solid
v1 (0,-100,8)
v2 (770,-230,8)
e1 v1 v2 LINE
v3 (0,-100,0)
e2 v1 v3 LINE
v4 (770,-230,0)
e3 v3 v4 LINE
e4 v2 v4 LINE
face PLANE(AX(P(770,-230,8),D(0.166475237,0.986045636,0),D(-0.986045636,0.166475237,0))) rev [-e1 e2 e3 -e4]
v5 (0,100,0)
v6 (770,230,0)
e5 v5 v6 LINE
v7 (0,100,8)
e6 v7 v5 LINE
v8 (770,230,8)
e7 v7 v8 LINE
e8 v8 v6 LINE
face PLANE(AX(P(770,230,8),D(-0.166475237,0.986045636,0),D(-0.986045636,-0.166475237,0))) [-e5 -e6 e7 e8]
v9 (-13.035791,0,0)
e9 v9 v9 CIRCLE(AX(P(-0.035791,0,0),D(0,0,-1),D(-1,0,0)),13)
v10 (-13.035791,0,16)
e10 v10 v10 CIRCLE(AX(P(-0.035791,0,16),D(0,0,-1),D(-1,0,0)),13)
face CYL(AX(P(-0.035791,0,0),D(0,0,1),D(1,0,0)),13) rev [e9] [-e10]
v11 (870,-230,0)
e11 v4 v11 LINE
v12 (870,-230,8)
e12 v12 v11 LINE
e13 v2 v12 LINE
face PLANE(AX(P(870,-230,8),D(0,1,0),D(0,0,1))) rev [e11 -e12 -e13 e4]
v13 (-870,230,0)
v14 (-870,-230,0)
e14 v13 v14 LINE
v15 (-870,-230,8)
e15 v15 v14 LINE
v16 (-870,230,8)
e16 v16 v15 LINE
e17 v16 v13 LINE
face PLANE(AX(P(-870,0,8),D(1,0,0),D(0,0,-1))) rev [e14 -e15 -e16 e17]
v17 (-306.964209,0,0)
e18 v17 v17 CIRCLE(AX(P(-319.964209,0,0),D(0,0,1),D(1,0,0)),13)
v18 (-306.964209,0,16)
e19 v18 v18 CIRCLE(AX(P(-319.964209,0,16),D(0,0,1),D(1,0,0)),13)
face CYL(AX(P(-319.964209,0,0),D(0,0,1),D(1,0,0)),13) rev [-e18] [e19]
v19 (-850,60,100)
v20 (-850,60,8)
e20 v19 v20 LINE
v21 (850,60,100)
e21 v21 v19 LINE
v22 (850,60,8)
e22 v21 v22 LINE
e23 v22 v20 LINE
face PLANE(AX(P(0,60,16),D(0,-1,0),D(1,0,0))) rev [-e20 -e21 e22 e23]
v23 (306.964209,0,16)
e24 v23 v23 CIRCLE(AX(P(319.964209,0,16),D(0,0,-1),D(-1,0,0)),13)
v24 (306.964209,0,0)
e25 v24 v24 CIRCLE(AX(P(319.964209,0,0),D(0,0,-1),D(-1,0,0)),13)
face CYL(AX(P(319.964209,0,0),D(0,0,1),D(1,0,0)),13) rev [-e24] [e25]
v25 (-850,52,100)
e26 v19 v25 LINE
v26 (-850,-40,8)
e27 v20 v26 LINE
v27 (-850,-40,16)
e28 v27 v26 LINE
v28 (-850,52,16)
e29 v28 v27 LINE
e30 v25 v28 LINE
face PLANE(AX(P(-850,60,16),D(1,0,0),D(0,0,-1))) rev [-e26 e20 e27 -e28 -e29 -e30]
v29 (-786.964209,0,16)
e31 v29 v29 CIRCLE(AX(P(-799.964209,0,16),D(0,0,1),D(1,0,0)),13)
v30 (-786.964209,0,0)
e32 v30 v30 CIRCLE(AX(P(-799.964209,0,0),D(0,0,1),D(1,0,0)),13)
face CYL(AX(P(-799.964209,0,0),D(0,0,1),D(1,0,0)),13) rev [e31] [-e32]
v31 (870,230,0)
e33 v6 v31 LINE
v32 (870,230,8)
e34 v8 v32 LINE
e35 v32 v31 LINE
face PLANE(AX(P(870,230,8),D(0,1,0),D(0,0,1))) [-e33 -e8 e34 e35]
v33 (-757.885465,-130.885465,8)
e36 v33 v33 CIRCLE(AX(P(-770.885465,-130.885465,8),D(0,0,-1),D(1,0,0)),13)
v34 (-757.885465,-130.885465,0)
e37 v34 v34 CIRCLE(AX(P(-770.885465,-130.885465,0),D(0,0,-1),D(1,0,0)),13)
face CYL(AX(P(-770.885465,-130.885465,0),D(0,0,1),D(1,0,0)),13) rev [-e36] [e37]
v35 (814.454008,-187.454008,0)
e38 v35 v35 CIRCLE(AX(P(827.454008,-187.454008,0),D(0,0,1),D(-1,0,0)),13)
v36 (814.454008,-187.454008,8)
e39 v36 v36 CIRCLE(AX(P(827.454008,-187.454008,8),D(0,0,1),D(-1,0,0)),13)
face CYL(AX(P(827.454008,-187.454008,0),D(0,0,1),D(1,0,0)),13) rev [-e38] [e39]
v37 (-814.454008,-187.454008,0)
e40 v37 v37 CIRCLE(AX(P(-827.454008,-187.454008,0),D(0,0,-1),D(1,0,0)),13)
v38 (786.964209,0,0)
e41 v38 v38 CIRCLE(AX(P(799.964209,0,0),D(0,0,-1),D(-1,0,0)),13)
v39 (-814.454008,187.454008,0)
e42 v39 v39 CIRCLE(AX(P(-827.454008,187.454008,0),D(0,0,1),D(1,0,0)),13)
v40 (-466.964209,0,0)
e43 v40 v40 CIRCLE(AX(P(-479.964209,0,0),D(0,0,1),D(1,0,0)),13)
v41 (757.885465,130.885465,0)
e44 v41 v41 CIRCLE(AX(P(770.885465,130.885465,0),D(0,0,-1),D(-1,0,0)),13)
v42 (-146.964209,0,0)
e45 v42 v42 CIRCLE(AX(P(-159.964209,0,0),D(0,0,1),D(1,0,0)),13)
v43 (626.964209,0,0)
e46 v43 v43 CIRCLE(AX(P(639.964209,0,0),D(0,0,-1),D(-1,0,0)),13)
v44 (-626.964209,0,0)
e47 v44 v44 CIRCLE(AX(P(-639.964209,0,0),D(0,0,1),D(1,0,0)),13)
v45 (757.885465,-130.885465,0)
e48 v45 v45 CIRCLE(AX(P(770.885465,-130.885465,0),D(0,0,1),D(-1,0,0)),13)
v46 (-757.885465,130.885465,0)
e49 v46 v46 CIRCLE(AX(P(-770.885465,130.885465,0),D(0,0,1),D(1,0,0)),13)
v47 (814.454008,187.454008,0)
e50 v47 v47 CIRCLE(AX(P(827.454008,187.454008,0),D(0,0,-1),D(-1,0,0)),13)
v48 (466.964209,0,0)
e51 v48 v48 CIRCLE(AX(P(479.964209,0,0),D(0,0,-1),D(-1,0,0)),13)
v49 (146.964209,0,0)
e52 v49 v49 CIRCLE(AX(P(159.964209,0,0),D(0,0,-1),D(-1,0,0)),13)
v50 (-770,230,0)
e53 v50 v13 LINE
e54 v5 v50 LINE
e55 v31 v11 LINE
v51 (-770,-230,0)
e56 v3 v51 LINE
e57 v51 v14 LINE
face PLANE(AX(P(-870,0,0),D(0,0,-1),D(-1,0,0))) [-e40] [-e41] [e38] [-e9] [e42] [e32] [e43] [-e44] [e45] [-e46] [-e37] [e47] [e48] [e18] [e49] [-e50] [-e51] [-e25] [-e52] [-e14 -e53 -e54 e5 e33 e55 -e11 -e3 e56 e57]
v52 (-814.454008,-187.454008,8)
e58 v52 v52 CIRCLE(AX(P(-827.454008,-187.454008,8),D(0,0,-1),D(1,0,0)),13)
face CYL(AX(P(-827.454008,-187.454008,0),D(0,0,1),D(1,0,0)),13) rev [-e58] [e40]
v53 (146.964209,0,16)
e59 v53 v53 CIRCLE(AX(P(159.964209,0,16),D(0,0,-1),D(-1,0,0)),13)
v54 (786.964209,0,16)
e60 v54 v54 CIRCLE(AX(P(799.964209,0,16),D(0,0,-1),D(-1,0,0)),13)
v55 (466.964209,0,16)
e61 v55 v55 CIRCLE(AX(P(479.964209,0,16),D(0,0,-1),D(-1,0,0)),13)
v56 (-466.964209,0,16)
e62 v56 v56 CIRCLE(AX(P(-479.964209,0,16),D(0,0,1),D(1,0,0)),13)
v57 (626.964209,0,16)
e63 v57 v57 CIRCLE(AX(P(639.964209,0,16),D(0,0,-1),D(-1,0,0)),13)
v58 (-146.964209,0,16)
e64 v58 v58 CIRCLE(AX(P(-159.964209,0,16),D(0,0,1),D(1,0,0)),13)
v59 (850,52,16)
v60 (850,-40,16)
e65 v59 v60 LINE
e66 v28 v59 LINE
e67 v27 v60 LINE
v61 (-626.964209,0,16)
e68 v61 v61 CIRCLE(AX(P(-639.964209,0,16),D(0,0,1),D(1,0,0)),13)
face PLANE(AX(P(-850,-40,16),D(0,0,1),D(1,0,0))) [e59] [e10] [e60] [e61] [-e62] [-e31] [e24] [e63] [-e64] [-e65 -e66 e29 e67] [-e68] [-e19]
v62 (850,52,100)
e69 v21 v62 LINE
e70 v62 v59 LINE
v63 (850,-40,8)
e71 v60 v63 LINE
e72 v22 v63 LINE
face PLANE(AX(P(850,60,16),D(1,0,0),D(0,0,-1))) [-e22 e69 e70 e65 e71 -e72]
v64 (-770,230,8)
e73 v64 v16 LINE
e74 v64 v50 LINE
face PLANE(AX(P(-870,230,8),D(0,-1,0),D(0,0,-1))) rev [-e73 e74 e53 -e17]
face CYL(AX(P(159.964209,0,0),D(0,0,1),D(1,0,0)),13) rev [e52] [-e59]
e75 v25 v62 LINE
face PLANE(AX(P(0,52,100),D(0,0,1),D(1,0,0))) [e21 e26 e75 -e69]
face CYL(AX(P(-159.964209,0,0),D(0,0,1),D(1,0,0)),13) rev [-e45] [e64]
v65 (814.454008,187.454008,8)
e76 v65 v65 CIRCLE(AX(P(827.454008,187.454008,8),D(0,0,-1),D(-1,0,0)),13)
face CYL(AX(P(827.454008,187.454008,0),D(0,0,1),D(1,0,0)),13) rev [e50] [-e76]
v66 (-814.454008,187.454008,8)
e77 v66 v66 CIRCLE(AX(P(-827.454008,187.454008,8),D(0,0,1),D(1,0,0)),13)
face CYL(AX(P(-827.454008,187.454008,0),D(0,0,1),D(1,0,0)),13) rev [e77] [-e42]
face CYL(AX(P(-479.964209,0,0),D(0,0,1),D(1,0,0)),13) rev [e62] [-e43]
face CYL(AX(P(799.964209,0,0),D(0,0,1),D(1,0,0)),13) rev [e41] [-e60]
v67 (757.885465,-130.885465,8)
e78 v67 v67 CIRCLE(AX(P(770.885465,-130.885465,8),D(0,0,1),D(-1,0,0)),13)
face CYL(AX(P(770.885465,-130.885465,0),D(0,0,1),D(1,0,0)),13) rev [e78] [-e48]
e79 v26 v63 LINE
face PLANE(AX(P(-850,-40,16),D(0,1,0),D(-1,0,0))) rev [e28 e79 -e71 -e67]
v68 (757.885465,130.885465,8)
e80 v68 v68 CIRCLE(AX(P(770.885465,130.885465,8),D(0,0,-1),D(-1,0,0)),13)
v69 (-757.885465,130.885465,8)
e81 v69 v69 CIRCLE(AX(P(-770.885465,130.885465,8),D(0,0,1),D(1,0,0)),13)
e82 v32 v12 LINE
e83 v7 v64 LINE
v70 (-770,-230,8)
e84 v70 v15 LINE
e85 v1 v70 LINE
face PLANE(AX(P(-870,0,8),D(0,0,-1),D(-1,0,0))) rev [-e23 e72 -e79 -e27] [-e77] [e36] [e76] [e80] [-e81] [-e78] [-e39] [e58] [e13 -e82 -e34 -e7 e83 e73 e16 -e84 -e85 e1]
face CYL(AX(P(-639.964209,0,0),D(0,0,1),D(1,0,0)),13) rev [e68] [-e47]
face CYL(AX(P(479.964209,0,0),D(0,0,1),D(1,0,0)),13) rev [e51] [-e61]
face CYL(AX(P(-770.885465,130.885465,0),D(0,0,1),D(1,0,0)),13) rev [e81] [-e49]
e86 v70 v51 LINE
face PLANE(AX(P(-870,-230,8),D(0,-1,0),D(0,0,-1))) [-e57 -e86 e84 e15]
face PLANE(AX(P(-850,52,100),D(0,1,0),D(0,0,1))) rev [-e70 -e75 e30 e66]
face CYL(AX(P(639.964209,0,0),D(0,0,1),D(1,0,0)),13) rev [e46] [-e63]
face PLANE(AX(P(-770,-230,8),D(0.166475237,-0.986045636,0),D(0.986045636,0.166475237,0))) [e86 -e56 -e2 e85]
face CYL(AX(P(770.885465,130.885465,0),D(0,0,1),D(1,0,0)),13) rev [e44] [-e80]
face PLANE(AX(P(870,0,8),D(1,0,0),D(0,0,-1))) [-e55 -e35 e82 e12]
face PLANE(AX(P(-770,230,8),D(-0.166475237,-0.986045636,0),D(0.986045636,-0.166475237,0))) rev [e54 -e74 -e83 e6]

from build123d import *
from build123d.topology import SkipClean

# Parameters (mm, degrees)
EXTRUDE_2_DEPTH        = 8
SKETCH_5_W             = 850
SKETCH_5_H             = 100
EXTRUDE_3_DEPTH        = 8
SKETCH_6_W             = 850
SKETCH_6_H             = 8
EXTRUDE_4_DEPTH        = 84
SKETCH_7_R             = 13
CUT_EXTRUDE_1_DEPTH    = 905.579460302
SKETCH_9_R             = 13
CUT_EXTRUDE_3_DEPTH    = 904.800863022
PATTERN_LINEAR_2_COUNT = 6
PATTERN_LINEAR_2_PITCH = 160
MIRROR_7_DEPTH         = 16
MIRROR_7_2_OUTLINE_R   = 13
MIRROR_7_2_DEPTH       = 8
MIRROR_START           = 8
MIRROR_7_3_OUTLINE_R   = 13
MIRROR_7_3_DEPTH       = 8
MIRROR_START_2         = 16
MIRROR_7_4_OUTLINE_W   = 850
MIRROR_7_4_OUTLINE_H   = 8
MIRROR_7_4_DEPTH       = 84


# Read off the part's stored shape, not the designer's step: 镜向7
with BuildPart() as part:
    # 草图1 → 凸台-拉伸2 (new body)
    with BuildSketch(Plane.XY):
        Polygon((-870, 0), (-870, 230), (-770, 230), (0, 100), (0, 0), align=None)
    extrude_2 = extrude(amount=EXTRUDE_2_DEPTH)

    # 镜向2: 凸台-拉伸2 across plane
    add(extrude_2.mirror(Plane.ZX))

    # 草图5 → 凸台-拉伸3 (add)
    with BuildSketch(Plane.XY.offset(8)):
        with Locations((-425, 10)):
            Rectangle(SKETCH_5_W, SKETCH_5_H)
    extrude(amount=EXTRUDE_3_DEPTH)

    # 草图6 → 凸台-拉伸4 (add)
    with BuildSketch(Plane.XY.offset(16)):
        with Locations((-425, 56)):
            Rectangle(SKETCH_6_W, SKETCH_6_H)
    extrude(amount=EXTRUDE_4_DEPTH)

    # 草图7 → 切除-拉伸1 (cut, through all)
    with BuildSketch(Plane.XY.offset(8)):
        with Locations((-770.885465198, 130.885465198)):
            Circle(SKETCH_7_R)
        with Locations((-827.454007693, 187.454007693)):
            Circle(SKETCH_7_R)
    cut_extrude_1 = extrude(amount=-CUT_EXTRUDE_1_DEPTH, mode=Mode.SUBTRACT)

    # 镜向5: 切除-拉伸1 across plane
    add(cut_extrude_1.mirror(Plane.ZX), mode=Mode.SUBTRACT)

    # 草图9 → 切除-拉伸3 (cut, through all)
    with BuildSketch(Plane.XY.offset(16)):
        with Locations((-799.964208957, 0)):
            Circle(SKETCH_9_R)
    cut_extrude_3 = extrude(amount=-CUT_EXTRUDE_3_DEPTH, mode=Mode.SUBTRACT)

    # 阵列(线性)2: 切除-拉伸3 ×6
    with Locations(*[(i * PATTERN_LINEAR_2_PITCH, 0, 0) for i in range(1, PATTERN_LINEAR_2_COUNT)]):
        add(cut_extrude_3, mode=Mode.SUBTRACT)

    # 镜向7 outline → 镜向7 (cut)
    with BuildSketch(Plane.XY):
        with BuildLine():
            ThreePointArc((0, -12.999950731), (-12.964208957, 0), (0, 12.999950731))
            ThreePointArc((0, 12.999950731), (-13.035791043, 0), (0, -12.999950731))
        make_face()
    extrude(amount=MIRROR_7_DEPTH, mode=Mode.SUBTRACT)

    # Mirror 7 2 outline → Mirror 7 2 (add)
    with BuildSketch(Plane.XY):
        with BuildLine():
            Line((870, -230), (870, 230))
            Line((870, 230), (770, 230))
            Line((770, 230), (0, 100))
            Line((0, 100), (0, 12.999950731))
            ThreePointArc((0, 12.999950731), (12.964208957, 0), (0, -12.999950731))
            Line((0, -12.999950731), (0, -100))
            Line((0, -100), (770, -230))
            Line((770, -230), (870, -230))
        make_face()
        with Locations((827.454007693, -187.454007693)):
            Circle(MIRROR_7_2_OUTLINE_R, mode=Mode.SUBTRACT)
        with Locations((770.885465198, -130.885465198)):
            Circle(MIRROR_7_2_OUTLINE_R, mode=Mode.SUBTRACT)
        with Locations((770.885465198, 130.885465198)):
            Circle(MIRROR_7_2_OUTLINE_R, mode=Mode.SUBTRACT)
        with Locations((827.454007693, 187.454007693)):
            Circle(MIRROR_7_2_OUTLINE_R, mode=Mode.SUBTRACT)
        with Locations((639.964208957, 0)):
            Circle(MIRROR_7_2_OUTLINE_R, mode=Mode.SUBTRACT)
        with Locations((799.964208957, 0)):
            Circle(MIRROR_7_2_OUTLINE_R, mode=Mode.SUBTRACT)
        with Locations((159.964208957, 0)):
            Circle(MIRROR_7_2_OUTLINE_R, mode=Mode.SUBTRACT)
        with Locations((319.964208957, 0)):
            Circle(MIRROR_7_2_OUTLINE_R, mode=Mode.SUBTRACT)
        with Locations((479.964208957, 0)):
            Circle(MIRROR_7_2_OUTLINE_R, mode=Mode.SUBTRACT)
    extrude(amount=MIRROR_7_2_DEPTH)

    # Mirror 7 3 outline → Mirror 7 3 (add)
    with SkipClean():  # the faces are left unmerged after this step: merging them gives an invalid solid
        with BuildSketch(Plane.XY.offset(MIRROR_START)):
            with BuildLine():
                Line((850, 60), (0, 60))
                Line((0, 60), (0, 12.999950731))
                ThreePointArc((0, 12.999950731), (12.964208957, 0), (0, -12.999950731))
                Line((0, -12.999950731), (0, -40))
                Line((0, -40), (850, -40))
                Line((850, -40), (850, 60))
            make_face()
            with Locations((799.964208957, 0)):
                Circle(MIRROR_7_3_OUTLINE_R, mode=Mode.SUBTRACT)
            with Locations((159.964208957, 0)):
                Circle(MIRROR_7_3_OUTLINE_R, mode=Mode.SUBTRACT)
            with Locations((319.964208957, 0)):
                Circle(MIRROR_7_3_OUTLINE_R, mode=Mode.SUBTRACT)
            with Locations((479.964208957, 0)):
                Circle(MIRROR_7_3_OUTLINE_R, mode=Mode.SUBTRACT)
            with Locations((639.964208957, 0)):
                Circle(MIRROR_7_3_OUTLINE_R, mode=Mode.SUBTRACT)
        extrude(amount=MIRROR_7_3_DEPTH)

    # Mirror 7 4 outline → Mirror 7 4 (add)
    with SkipClean():  # the faces are left unmerged after this step: merging them gives an invalid solid
        with BuildSketch(Plane.XY.offset(MIRROR_START_2)):
            with Locations((425, 56)):
                Rectangle(MIRROR_7_4_OUTLINE_W, MIRROR_7_4_OUTLINE_H)
        extrude(amount=MIRROR_7_4_DEPTH)


solid = part.part
